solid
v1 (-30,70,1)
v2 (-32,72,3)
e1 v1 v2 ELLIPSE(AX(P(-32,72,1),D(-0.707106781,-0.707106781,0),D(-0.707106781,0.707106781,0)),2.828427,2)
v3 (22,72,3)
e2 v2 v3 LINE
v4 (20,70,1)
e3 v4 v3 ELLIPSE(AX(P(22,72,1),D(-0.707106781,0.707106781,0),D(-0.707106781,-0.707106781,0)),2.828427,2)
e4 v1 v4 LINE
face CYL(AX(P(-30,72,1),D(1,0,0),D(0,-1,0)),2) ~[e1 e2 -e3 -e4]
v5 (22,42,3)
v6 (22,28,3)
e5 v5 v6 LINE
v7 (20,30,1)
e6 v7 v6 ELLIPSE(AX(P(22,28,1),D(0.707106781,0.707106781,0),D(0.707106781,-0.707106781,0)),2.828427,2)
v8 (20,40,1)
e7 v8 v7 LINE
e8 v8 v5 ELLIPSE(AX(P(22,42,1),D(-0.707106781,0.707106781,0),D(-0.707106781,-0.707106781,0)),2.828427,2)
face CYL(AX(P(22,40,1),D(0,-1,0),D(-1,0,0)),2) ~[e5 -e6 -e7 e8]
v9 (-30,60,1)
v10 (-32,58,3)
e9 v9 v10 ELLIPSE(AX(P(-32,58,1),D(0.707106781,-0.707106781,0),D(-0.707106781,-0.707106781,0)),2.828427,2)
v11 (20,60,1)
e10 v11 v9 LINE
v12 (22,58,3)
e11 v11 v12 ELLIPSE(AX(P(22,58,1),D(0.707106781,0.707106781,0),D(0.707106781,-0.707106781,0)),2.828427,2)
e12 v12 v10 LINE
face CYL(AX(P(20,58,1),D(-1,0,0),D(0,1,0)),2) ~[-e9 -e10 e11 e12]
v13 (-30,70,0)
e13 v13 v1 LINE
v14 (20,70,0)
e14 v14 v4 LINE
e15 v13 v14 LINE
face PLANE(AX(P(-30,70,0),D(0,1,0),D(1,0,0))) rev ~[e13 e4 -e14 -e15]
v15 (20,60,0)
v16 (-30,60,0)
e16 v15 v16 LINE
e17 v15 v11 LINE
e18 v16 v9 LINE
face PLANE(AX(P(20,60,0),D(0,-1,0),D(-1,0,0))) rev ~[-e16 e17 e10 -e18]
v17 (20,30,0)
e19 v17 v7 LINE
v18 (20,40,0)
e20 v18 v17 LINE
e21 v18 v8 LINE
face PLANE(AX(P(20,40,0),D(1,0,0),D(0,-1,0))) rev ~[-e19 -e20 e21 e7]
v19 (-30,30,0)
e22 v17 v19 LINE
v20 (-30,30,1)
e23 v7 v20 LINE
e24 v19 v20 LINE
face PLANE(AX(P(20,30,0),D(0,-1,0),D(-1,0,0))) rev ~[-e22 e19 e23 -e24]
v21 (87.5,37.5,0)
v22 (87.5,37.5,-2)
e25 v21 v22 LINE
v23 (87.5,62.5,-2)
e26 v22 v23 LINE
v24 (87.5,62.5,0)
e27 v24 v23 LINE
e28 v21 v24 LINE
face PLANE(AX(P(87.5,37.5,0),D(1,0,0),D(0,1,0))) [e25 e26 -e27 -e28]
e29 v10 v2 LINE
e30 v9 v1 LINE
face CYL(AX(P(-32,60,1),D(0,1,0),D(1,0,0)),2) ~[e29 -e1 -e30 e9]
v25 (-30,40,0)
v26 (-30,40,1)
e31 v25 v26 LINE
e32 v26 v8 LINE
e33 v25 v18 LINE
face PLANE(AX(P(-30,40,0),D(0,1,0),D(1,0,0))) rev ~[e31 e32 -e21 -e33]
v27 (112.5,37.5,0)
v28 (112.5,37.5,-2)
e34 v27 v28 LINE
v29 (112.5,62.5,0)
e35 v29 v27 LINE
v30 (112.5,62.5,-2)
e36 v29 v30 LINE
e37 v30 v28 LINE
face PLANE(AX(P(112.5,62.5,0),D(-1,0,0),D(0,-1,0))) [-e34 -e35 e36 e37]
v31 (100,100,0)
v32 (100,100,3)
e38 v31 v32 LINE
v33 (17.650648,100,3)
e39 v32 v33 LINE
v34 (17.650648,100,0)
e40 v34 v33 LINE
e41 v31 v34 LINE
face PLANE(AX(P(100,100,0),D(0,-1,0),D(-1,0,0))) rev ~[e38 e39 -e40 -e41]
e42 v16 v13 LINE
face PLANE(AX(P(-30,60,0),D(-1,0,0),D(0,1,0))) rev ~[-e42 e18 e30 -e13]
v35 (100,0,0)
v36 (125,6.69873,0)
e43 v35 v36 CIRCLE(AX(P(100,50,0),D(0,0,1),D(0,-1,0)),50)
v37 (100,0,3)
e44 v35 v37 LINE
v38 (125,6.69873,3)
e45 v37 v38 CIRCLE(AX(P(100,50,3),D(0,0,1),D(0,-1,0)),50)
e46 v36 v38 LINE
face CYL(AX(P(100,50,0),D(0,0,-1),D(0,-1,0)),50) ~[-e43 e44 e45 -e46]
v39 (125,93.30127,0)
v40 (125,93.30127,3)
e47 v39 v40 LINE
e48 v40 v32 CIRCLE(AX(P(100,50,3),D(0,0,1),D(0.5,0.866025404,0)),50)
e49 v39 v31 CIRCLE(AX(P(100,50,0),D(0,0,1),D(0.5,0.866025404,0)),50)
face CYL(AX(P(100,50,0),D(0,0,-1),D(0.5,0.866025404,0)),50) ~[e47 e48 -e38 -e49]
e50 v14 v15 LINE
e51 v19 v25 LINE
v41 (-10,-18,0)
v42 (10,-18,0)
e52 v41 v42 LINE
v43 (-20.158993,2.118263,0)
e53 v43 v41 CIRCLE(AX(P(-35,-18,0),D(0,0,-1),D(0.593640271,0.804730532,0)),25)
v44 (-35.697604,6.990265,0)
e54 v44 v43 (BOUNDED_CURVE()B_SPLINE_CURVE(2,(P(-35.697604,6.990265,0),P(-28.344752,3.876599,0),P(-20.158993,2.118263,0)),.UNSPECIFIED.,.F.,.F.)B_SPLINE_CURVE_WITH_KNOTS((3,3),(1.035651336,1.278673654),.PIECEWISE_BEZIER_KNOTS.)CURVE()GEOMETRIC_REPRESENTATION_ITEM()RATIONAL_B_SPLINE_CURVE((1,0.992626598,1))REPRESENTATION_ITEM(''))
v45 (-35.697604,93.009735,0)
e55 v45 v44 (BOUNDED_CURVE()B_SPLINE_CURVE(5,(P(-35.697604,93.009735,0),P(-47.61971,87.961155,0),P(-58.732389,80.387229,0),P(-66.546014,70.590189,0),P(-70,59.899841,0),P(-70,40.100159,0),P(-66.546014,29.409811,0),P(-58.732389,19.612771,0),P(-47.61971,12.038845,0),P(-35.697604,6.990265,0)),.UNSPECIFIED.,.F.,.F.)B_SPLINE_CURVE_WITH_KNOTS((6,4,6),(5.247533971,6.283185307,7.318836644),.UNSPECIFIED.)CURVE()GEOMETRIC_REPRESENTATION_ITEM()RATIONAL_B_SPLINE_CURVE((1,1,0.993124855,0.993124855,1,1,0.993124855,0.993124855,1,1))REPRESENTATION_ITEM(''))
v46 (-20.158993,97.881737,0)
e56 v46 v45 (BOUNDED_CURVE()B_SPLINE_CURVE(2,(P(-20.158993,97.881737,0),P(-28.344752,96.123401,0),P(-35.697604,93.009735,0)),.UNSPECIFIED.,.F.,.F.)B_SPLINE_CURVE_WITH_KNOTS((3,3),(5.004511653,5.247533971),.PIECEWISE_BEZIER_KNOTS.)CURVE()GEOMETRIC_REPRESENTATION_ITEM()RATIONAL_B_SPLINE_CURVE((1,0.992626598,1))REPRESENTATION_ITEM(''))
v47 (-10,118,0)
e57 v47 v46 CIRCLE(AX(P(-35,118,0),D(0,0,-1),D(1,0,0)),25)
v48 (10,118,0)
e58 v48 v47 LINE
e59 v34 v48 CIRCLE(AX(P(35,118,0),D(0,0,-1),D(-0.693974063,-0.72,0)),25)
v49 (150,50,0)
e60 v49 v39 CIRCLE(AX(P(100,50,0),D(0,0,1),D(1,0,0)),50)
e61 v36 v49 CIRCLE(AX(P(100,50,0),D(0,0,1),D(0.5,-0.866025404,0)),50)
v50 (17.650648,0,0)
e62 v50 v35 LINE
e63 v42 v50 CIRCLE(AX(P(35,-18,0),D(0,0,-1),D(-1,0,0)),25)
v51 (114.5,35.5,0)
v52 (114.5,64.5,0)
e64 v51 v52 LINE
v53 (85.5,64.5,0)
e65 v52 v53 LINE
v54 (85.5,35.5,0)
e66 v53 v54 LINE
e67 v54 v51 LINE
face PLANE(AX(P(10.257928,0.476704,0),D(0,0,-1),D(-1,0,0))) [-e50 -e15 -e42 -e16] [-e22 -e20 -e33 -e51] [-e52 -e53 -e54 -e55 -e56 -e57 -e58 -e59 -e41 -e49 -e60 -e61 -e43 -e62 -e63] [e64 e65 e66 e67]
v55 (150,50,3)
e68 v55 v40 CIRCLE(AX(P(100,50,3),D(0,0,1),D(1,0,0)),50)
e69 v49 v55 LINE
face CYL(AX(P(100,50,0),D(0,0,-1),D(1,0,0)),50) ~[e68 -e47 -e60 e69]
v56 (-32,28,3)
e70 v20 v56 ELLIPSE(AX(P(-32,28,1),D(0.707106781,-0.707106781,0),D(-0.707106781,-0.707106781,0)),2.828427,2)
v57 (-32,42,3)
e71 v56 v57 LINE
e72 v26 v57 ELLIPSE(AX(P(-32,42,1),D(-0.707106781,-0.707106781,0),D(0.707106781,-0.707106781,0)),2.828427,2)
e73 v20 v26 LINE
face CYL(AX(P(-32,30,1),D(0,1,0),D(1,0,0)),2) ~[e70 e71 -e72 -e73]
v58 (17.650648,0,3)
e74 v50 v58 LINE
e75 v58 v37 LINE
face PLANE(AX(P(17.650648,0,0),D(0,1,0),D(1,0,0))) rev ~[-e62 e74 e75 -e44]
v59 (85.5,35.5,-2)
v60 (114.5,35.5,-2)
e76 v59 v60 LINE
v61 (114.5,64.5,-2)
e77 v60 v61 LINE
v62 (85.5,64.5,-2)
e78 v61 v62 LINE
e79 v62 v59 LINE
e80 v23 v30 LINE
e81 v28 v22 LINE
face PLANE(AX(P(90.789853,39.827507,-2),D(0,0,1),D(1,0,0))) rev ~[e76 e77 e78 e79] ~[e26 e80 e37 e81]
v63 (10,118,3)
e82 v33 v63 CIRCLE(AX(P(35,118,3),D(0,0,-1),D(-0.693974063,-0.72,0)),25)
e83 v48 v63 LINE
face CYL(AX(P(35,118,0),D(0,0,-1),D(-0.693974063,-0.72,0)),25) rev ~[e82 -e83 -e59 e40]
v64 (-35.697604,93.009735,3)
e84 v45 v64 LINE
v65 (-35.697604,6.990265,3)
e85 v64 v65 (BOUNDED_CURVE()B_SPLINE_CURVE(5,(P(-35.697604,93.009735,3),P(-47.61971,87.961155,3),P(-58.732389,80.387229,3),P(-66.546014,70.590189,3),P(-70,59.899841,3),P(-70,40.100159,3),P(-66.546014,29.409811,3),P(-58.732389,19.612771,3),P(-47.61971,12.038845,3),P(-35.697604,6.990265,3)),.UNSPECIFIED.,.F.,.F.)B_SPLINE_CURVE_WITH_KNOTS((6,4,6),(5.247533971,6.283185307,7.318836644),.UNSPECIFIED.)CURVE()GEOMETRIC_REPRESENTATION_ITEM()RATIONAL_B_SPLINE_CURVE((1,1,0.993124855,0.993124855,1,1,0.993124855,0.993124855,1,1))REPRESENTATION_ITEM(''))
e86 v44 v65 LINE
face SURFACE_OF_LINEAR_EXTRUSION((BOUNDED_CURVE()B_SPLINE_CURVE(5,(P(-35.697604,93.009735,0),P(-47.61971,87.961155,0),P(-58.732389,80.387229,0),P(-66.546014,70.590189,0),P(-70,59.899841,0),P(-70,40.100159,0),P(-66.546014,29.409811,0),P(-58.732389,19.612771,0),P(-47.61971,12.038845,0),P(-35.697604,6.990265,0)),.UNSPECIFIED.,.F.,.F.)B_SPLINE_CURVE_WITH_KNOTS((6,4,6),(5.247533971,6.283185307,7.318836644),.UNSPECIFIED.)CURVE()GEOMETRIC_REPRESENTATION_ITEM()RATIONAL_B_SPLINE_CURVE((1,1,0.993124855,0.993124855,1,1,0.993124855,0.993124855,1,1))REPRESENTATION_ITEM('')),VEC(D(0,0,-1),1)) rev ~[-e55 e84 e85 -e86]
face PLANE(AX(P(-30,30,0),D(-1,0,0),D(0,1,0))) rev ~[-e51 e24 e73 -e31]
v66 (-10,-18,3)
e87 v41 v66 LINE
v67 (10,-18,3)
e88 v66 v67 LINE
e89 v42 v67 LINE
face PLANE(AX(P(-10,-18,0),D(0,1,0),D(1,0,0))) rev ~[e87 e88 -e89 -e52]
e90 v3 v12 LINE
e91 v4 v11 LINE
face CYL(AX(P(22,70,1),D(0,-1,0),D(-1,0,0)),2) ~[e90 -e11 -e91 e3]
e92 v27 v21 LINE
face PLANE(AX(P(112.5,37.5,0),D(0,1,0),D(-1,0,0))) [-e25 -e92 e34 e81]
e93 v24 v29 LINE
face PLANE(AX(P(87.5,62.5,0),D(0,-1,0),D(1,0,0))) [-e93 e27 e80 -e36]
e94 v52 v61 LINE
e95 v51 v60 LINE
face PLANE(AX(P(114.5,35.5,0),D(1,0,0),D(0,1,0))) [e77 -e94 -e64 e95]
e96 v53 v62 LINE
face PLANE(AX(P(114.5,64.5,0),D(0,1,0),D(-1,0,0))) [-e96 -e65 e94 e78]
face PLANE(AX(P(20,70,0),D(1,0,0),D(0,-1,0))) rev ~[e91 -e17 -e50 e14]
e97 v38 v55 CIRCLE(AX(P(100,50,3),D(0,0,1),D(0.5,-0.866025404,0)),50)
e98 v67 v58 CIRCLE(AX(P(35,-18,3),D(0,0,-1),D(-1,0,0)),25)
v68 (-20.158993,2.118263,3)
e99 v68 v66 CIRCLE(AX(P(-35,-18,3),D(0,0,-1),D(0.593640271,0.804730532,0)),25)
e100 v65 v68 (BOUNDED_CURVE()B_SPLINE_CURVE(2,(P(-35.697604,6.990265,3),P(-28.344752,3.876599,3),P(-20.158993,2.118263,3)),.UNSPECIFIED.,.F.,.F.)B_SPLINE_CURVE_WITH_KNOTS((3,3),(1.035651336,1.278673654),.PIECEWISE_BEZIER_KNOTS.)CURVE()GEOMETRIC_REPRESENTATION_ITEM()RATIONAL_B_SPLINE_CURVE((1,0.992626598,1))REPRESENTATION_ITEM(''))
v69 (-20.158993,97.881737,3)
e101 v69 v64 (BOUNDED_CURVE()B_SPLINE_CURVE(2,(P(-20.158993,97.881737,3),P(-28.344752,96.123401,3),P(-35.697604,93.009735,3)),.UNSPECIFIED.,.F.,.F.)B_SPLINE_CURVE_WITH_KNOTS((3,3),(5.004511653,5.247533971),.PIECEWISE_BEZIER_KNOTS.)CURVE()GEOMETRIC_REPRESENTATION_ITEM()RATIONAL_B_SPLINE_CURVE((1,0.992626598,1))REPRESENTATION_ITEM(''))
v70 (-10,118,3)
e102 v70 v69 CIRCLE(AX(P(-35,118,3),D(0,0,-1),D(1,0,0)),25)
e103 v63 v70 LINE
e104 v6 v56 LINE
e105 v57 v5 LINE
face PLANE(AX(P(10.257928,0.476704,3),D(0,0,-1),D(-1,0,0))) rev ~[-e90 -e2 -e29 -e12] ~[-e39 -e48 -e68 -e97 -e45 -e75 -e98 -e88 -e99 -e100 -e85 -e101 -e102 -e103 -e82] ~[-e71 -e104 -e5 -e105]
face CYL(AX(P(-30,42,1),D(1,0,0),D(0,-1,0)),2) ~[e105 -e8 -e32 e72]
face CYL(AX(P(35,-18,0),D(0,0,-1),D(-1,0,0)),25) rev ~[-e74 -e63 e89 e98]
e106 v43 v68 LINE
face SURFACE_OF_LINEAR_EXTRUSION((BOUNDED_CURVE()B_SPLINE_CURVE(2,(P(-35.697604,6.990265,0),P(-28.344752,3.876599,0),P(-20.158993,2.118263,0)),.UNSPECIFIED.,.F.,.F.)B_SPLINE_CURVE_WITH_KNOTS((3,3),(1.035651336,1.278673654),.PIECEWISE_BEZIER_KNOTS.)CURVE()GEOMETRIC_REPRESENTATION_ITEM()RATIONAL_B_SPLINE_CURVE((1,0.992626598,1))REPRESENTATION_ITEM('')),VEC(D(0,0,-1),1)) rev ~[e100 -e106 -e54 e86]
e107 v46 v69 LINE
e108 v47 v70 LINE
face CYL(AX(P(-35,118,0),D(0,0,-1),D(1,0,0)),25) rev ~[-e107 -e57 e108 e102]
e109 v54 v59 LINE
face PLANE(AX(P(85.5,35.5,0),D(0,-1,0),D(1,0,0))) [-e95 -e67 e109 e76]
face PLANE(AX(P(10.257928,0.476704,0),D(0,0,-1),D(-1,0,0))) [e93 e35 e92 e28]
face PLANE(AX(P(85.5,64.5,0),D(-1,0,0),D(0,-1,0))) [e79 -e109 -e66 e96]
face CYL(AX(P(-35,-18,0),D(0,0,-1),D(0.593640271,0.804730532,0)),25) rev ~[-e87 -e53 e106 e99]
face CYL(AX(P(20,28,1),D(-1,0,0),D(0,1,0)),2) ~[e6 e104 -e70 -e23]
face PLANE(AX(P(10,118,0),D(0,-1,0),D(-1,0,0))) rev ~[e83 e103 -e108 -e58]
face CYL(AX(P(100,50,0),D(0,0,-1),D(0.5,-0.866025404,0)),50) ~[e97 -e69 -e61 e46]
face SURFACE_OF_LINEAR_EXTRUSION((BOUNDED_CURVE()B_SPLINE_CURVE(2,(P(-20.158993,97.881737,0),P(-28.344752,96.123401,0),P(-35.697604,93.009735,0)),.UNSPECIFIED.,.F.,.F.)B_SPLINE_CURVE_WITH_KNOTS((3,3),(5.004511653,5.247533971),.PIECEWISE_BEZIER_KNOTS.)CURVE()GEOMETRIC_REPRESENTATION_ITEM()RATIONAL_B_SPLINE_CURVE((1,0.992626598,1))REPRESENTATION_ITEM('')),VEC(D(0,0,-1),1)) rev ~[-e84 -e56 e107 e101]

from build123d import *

# Parameters (mm, degrees)
F1_DEPTH = 3
F2_R     = 2
F3_DEPTH = 2


with BuildPart() as f1:
    # F0 (on Top) → F1 (new body)
    with BuildSketch(Plane.XY):
        with BuildLine():
            add(Edge.make_bspline(
                [(0, 0), (10.2976274735, 0), (20.158993222, 2.1182632902)],
                knots=[1.5707963268, 1.5707963268, 1.5707963268, 1.8629189995, 1.8629189995, 1.8629189995], degree=2, weights=[1, 0.9893519935, 1]))
            Line((0, 0), (17.6506484271, 0))
            ThreePointArc((17.6506484271, 0), (18.8700107709, 1.1003520247), (20.158993222, 2.1182632902))
        make_face()
        with BuildLine():
            add(Edge.make_bspline(
                [(-20.158993222, 2.1182632902), (-10.2976274735, 0), (0, 0)],
                knots=[1.2786736541, 1.2786736541, 1.2786736541, 1.5707963268, 1.5707963268, 1.5707963268], degree=2, weights=[1, 0.9893519935, 1]))
            Line((0, 0), (0, 30))
            Line((0, 30), (-10, 30))
            Line((-10, 30), (-30, 30))
            Line((-30, 30), (-30, 40))
            Line((-30, 40), (-10, 40))
            Line((-10, 40), (0, 40))
            Line((0, 40), (0, 50))
            Line((0, 50), (-70, 50))
            add(Edge.make_bspline(
                [(-70, 50), (-70, 21.516086051), (-35.6976035326, 6.9902650909)],
                knots=[0, 0, 0, 1.0356513364, 1.0356513364, 1.0356513364], degree=2, weights=[1, 0.8688975097, 1]))
            ThreePointArc((-35.6976035326, 6.9902650909), (-27.5204903752, 5.8549142898), (-20.158993222, 2.1182632902))
        make_face()
        with BuildLine():
            Line((0, -18), (0, 0))
            add(Edge.make_bspline(
                [(-20.158993222, 2.1182632902), (-10.2976274735, 0), (0, 0)],
                knots=[1.2786736541, 1.2786736541, 1.2786736541, 1.5707963268, 1.5707963268, 1.5707963268], degree=2, weights=[1, 0.9893519935, 1]))
            ThreePointArc((-20.158993222, 2.1182632902), (-12.6838044298, -6.7311307011), (-10, -18))
            Line((-10, -18), (0, -18))
        make_face()
        with BuildLine():
            Line((0, 30), (0, 0))
            add(Edge.make_bspline(
                [(0, 0), (10.2976274735, 0), (20.158993222, 2.1182632902)],
                knots=[1.5707963268, 1.5707963268, 1.5707963268, 1.8629189995, 1.8629189995, 1.8629189995], degree=2, weights=[1, 0.9893519935, 1]))
            ThreePointArc((20.158993222, 2.1182632902), (27.5204903752, 5.8549142898), (35.6976035326, 6.9902650909))
            add(Edge.make_bspline(
                [(35.6976035326, 6.9902650909), (49.4779363229, 12.8257362969), (58.3333333333, 22.3614600804)],
                knots=[2.1059413172, 2.1059413172, 2.1059413172, 2.5559071101, 2.5559071101, 2.5559071101], degree=2, weights=[1, 0.9747979228, 1]))
            ThreePointArc((58.3333333333, 22.3614600804), (52.1286446122, 35.5662432703), (50, 50))
            Line((50, 50), (0, 50))
            Line((0, 50), (0, 40))
            Line((0, 40), (20, 40))
            Line((20, 40), (20, 30))
            Line((20, 30), (0, 30))
        make_face()
        with BuildLine():
            Line((17.6506484271, 0), (0, 0))
            Line((0, 0), (0, -18))
            Line((0, -18), (10, -18))
            ThreePointArc((10, -18), (11.9920254116, -8.2207819669), (17.6506484271, 0))
        make_face()
        with BuildLine():
            ThreePointArc((20.158993222, 2.1182632902), (18.8700107709, 1.1003520247), (17.6506484271, 0))
            Line((17.6506484271, 0), (52.3493515729, 0))
            ThreePointArc((52.3493515729, 0), (44.67672975, 5.0512668056), (35.6976035326, 6.9902650909))
            add(Edge.make_bspline(
                [(20.158993222, 2.1182632902), (28.3447518468, 3.8765990461), (35.6976035326, 6.9902650909)],
                knots=[1.8629189995, 1.8629189995, 1.8629189995, 2.1059413172, 2.1059413172, 2.1059413172], degree=2, weights=[1, 0.9926265982, 1]))
        make_face()
        with BuildLine():
            add(Edge.make_bspline(
                [(-35.6976035326, 6.9902650909), (-28.3447518468, 3.8765990461), (-20.158993222, 2.1182632902)],
                knots=[1.0356513364, 1.0356513364, 1.0356513364, 1.2786736541, 1.2786736541, 1.2786736541], degree=2, weights=[1, 0.9926265982, 1]))
            ThreePointArc((-20.158993222, 2.1182632902), (-27.5204903752, 5.8549142898), (-35.6976035326, 6.9902650909))
        make_face()
        with BuildLine():
            ThreePointArc((35.6976035326, 6.9902650909), (27.5204903752, 5.8549142898), (20.158993222, 2.1182632902))
            add(Edge.make_bspline(
                [(20.158993222, 2.1182632902), (28.3447518468, 3.8765990461), (35.6976035326, 6.9902650909)],
                knots=[1.8629189995, 1.8629189995, 1.8629189995, 2.1059413172, 2.1059413172, 2.1059413172], degree=2, weights=[1, 0.9926265982, 1]))
        make_face()
        with BuildLine():
            ThreePointArc((35.6976035326, 6.9902650909), (44.67672975, 5.0512668056), (52.3493515729, 0))
            Line((52.3493515729, 0), (100, 0))
            ThreePointArc((100, 0), (76.3560472423, 5.9436327191), (58.3333333333, 22.3614600804))
            add(Edge.make_bspline(
                [(35.6976035326, 6.9902650909), (49.4779363229, 12.8257362969), (58.3333333333, 22.3614600804)],
                knots=[2.1059413172, 2.1059413172, 2.1059413172, 2.5559071101, 2.5559071101, 2.5559071101], degree=2, weights=[1, 0.9747979228, 1]))
        make_face()
        with BuildLine():
            ThreePointArc((58.3333333333, 22.3614600804), (76.3560472423, 5.9436327191), (100, 0))
            ThreePointArc((100, 0), (112.9409522551, 1.7037086855), (125, 6.6987298108))
            ThreePointArc((125, 6.6987298108), (110.8310397827, 18.9227968521), (102.1486677301, 35.5))
            Line((102.1486677301, 35.5), (85.5, 35.5))
            Line((85.5, 35.5), (85.5, 50))
            Line((85.5, 50), (70, 50))
            add(Edge.make_bspline(
                [(58.3333333333, 22.3614600804), (70, 34.9244327711), (70, 50)],
                knots=[2.5559071101, 2.5559071101, 2.5559071101, 3.1415926536, 3.1415926536, 3.1415926536], degree=2, weights=[1, 0.9574271078, 1]))
        make_face()
        with BuildLine():
            add(Edge.make_bspline(
                [(-35.6976035326, 93.0097349091), (-70, 78.483913949), (-70, 50)],
                knots=[5.2475339708, 5.2475339708, 5.2475339708, 6.2831853072, 6.2831853072, 6.2831853072], degree=2, weights=[1, 0.8688975097, 1]))
            Line((-70, 50), (0, 50))
            Line((0, 50), (0, 60))
            Line((0, 60), (-10, 60))
            Line((-10, 60), (-30, 60))
            Line((-30, 60), (-30, 70))
            Line((-30, 70), (-10, 70))
            Line((-10, 70), (0, 70))
            Line((0, 70), (0, 100))
            add(Edge.make_bspline(
                [(0, 100), (-10.2976274735, 100), (-20.158993222, 97.8817367098)],
                knots=[4.7123889804, 4.7123889804, 4.7123889804, 5.0045116531, 5.0045116531, 5.0045116531], degree=2, weights=[1, 0.9893519935, 1]))
            add(Edge.make_bspline(
                [(-20.158993222, 97.8817367098), (-28.3447518468, 96.1234009539), (-35.6976035326, 93.0097349091)],
                knots=[5.0045116531, 5.0045116531, 5.0045116531, 5.2475339708, 5.2475339708, 5.2475339708], degree=2, weights=[1, 0.9926265982, 1]))
        make_face()
        with BuildLine():
            ThreePointArc((50, 50), (52.1286446122, 35.5662432703), (58.3333333333, 22.3614600804))
            add(Edge.make_bspline(
                [(58.3333333333, 22.3614600804), (70, 34.9244327711), (70, 50)],
                knots=[2.5559071101, 2.5559071101, 2.5559071101, 3.1415926536, 3.1415926536, 3.1415926536], degree=2, weights=[1, 0.9574271078, 1]))
            Line((70, 50), (50, 50))
        make_face()
        with BuildLine():
            ThreePointArc((102.1486677301, 35.5), (110.8310397827, 18.9227968521), (125, 6.6987298108))
            ThreePointArc((125, 6.6987298108), (143.3012701892, 25), (150, 50))
            Line((150, 50), (114.5, 50))
            Line((114.5, 50), (114.5, 35.5))
            Line((114.5, 35.5), (102.1486677301, 35.5))
        make_face()
        with BuildLine():
            Line((0, 60), (0, 50))
            Line((0, 50), (50, 50))
            ThreePointArc((50, 50), (52.1286446122, 64.4337567297), (58.3333333333, 77.6385399196))
            add(Edge.make_bspline(
                [(58.3333333333, 77.6385399196), (49.4779363229, 87.1742637031), (35.6976035326, 93.0097349091)],
                knots=[3.727278197, 3.727278197, 3.727278197, 4.17724399, 4.17724399, 4.17724399], degree=2, weights=[1, 0.9747979228, 1]))
            ThreePointArc((35.6976035326, 93.0097349091), (27.5204903752, 94.1450857102), (20.158993222, 97.8817367098))
            add(Edge.make_bspline(
                [(20.158993222, 97.8817367098), (10.2976274735, 100), (0, 100)],
                knots=[4.4202663077, 4.4202663077, 4.4202663077, 4.7123889804, 4.7123889804, 4.7123889804], degree=2, weights=[1, 0.9893519935, 1]))
            Line((0, 100), (0, 70))
            Line((0, 70), (20, 70))
            Line((20, 70), (20, 60))
            Line((20, 60), (0, 60))
        make_face()
        with BuildLine():
            Line((50, 50), (70, 50))
            add(Edge.make_bspline(
                [(70, 50), (70, 65.0755672289), (58.3333333333, 77.6385399196)],
                knots=[3.1415926536, 3.1415926536, 3.1415926536, 3.727278197, 3.727278197, 3.727278197], degree=2, weights=[1, 0.9574271078, 1]))
            ThreePointArc((58.3333333333, 77.6385399196), (52.1286446122, 64.4337567297), (50, 50))
        make_face()
        with BuildLine():
            add(Edge.make_bspline(
                [(70, 50), (70, 65.0755672289), (58.3333333333, 77.6385399196)],
                knots=[3.1415926536, 3.1415926536, 3.1415926536, 3.727278197, 3.727278197, 3.727278197], degree=2, weights=[1, 0.9574271078, 1]))
            Line((70, 50), (85.5, 50))
            Line((85.5, 50), (85.5, 64.5))
            Line((85.5, 64.5), (102.1486677301, 64.5))
            ThreePointArc((102.1486677301, 64.5), (110.8310397827, 81.0772031479), (125, 93.3012701892))
            ThreePointArc((125, 93.3012701892), (112.9409522551, 98.2962913145), (100, 100))
            ThreePointArc((100, 100), (76.3560472423, 94.0563672809), (58.3333333333, 77.6385399196))
        make_face()
        with BuildLine():
            Line((85.5, 35.5), (102.1486677301, 35.5))
            ThreePointArc((102.1486677301, 35.5), (101.8578009321, 36.4970866512), (101.5877081724, 37.5))
            Line((101.5877081724, 37.5), (87.5, 37.5))
            Line((87.5, 37.5), (87.5, 50))
            Line((87.5, 50), (85.5, 50))
            Line((85.5, 50), (85.5, 35.5))
        make_face()
        with BuildLine():
            ThreePointArc((101.5877081724, 37.5), (101.8578009321, 36.4970866512), (102.1486677301, 35.5))
            Line((102.1486677301, 35.5), (114.5, 35.5))
            Line((114.5, 35.5), (114.5, 50))
            Line((114.5, 50), (112.5, 50))
            Line((112.5, 50), (112.5, 37.5))
            Line((112.5, 37.5), (101.5877081724, 37.5))
        make_face()
        with BuildLine():
            Line((114.5, 50), (150, 50))
            ThreePointArc((150, 50), (143.3012701892, 75), (125, 93.3012701892))
            ThreePointArc((125, 93.3012701892), (110.8310397827, 81.0772031479), (102.1486677301, 64.5))
            Line((102.1486677301, 64.5), (114.5, 64.5))
            Line((114.5, 64.5), (114.5, 50))
        make_face()
        with BuildLine():
            ThreePointArc((-10, 118), (-12.6838044298, 106.7311307011), (-20.158993222, 97.8817367098))
            add(Edge.make_bspline(
                [(0, 100), (-10.2976274735, 100), (-20.158993222, 97.8817367098)],
                knots=[4.7123889804, 4.7123889804, 4.7123889804, 5.0045116531, 5.0045116531, 5.0045116531], degree=2, weights=[1, 0.9893519935, 1]))
            Line((0, 100), (0, 118))
            Line((0, 118), (-10, 118))
        make_face()
        with BuildLine():
            add(Edge.make_bspline(
                [(58.3333333333, 77.6385399196), (49.4779363229, 87.1742637031), (35.6976035326, 93.0097349091)],
                knots=[3.727278197, 3.727278197, 3.727278197, 4.17724399, 4.17724399, 4.17724399], degree=2, weights=[1, 0.9747979228, 1]))
            ThreePointArc((58.3333333333, 77.6385399196), (76.3560472423, 94.0563672809), (100, 100))
            Line((100, 100), (52.3493515729, 100))
            ThreePointArc((52.3493515729, 100), (44.67672975, 94.9487331944), (35.6976035326, 93.0097349091))
        make_face()
        with BuildLine():
            Line((85.5, 64.5), (85.5, 50))
            Line((85.5, 50), (87.5, 50))
            Line((87.5, 50), (87.5, 62.5))
            Line((87.5, 62.5), (101.5877081724, 62.5))
            ThreePointArc((101.5877081724, 62.5), (101.8578009321, 63.5029133488), (102.1486677301, 64.5))
            Line((102.1486677301, 64.5), (85.5, 64.5))
        make_face()
        with BuildLine():
            Line((87.5, 37.5), (101.5877081724, 37.5))
            ThreePointArc((101.5877081724, 37.5), (100.3985151866, 43.6997853759), (100, 50))
            Line((100, 50), (87.5, 50))
            Line((87.5, 50), (87.5, 37.5))
        make_face()
        with BuildLine():
            ThreePointArc((100, 50), (100.3985151866, 43.6997853759), (101.5877081724, 37.5))
            Line((101.5877081724, 37.5), (112.5, 37.5))
            Line((112.5, 37.5), (112.5, 50))
            Line((112.5, 50), (100, 50))
        make_face()
        with BuildLine():
            Line((112.5, 50), (114.5, 50))
            Line((114.5, 50), (114.5, 64.5))
            Line((114.5, 64.5), (102.1486677301, 64.5))
            ThreePointArc((102.1486677301, 64.5), (101.8578009321, 63.5029133488), (101.5877081724, 62.5))
            Line((101.5877081724, 62.5), (112.5, 62.5))
            Line((112.5, 62.5), (112.5, 50))
        make_face()
        with BuildLine():
            Line((0, 118), (0, 100))
            Line((0, 100), (17.6506484271, 100))
            ThreePointArc((17.6506484271, 100), (11.9920254116, 108.2207819669), (10, 118))
            Line((10, 118), (0, 118))
        make_face()
        with BuildLine():
            Line((17.6506484271, 100), (0, 100))
            add(Edge.make_bspline(
                [(20.158993222, 97.8817367098), (10.2976274735, 100), (0, 100)],
                knots=[4.4202663077, 4.4202663077, 4.4202663077, 4.7123889804, 4.7123889804, 4.7123889804], degree=2, weights=[1, 0.9893519935, 1]))
            ThreePointArc((20.158993222, 97.8817367098), (18.8700107709, 98.8996479753), (17.6506484271, 100))
        make_face()
        with BuildLine():
            ThreePointArc((20.158993222, 97.8817367098), (27.5204903752, 94.1450857102), (35.6976035326, 93.0097349091))
            add(Edge.make_bspline(
                [(35.6976035326, 93.0097349091), (28.3447518468, 96.1234009539), (20.158993222, 97.8817367098)],
                knots=[4.17724399, 4.17724399, 4.17724399, 4.4202663077, 4.4202663077, 4.4202663077], degree=2, weights=[1, 0.9926265982, 1]))
        make_face()
        with BuildLine():
            add(Edge.make_bspline(
                [(35.6976035326, 93.0097349091), (28.3447518468, 96.1234009539), (20.158993222, 97.8817367098)],
                knots=[4.17724399, 4.17724399, 4.17724399, 4.4202663077, 4.4202663077, 4.4202663077], degree=2, weights=[1, 0.9926265982, 1]))
            ThreePointArc((35.6976035326, 93.0097349091), (44.67672975, 94.9487331944), (52.3493515729, 100))
            Line((52.3493515729, 100), (17.6506484271, 100))
            ThreePointArc((17.6506484271, 100), (18.8700107709, 98.8996479753), (20.158993222, 97.8817367098))
        make_face()
        with BuildLine():
            Line((87.5, 62.5), (87.5, 50))
            Line((87.5, 50), (100, 50))
            ThreePointArc((100, 50), (100.3985151866, 56.3002146241), (101.5877081724, 62.5))
            Line((101.5877081724, 62.5), (87.5, 62.5))
        make_face()
        with BuildLine():
            ThreePointArc((101.5877081724, 62.5), (100.3985151866, 56.3002146241), (100, 50))
            Line((100, 50), (112.5, 50))
            Line((112.5, 50), (112.5, 62.5))
            Line((112.5, 62.5), (101.5877081724, 62.5))
        make_face()
    extrude(amount=F1_DEPTH)

    # F2
    f2_edges = [f1.edges().sort_by_distance(p)[0] for p in [
        (20, 65, 3),
        (20, 35, 3),
        (-5, 40, 3),
        (-5, 60, 3),
        (-5, 30, 3),
        (-30, 35, 3),
        (-30, 65, 3),
        (-5, 70, 3),
    ]]
    fillet(f2_edges, radius=F2_R)

    # F0 (on Top) → F3 (join)
    with BuildSketch(Plane.XY):
        with BuildLine():
            Line((85.5, 35.5), (102.1486677301, 35.5))
            ThreePointArc((102.1486677301, 35.5), (101.8578009321, 36.4970866512), (101.5877081724, 37.5))
            Line((101.5877081724, 37.5), (87.5, 37.5))
            Line((87.5, 37.5), (87.5, 50))
            Line((87.5, 50), (85.5, 50))
            Line((85.5, 50), (85.5, 35.5))
        make_face()
        with BuildLine():
            ThreePointArc((101.5877081724, 37.5), (101.8578009321, 36.4970866512), (102.1486677301, 35.5))
            Line((102.1486677301, 35.5), (114.5, 35.5))
            Line((114.5, 35.5), (114.5, 50))
            Line((114.5, 50), (112.5, 50))
            Line((112.5, 50), (112.5, 37.5))
            Line((112.5, 37.5), (101.5877081724, 37.5))
        make_face()
        with BuildLine():
            Line((112.5, 50), (114.5, 50))
            Line((114.5, 50), (114.5, 64.5))
            Line((114.5, 64.5), (102.1486677301, 64.5))
            ThreePointArc((102.1486677301, 64.5), (101.8578009321, 63.5029133488), (101.5877081724, 62.5))
            Line((101.5877081724, 62.5), (112.5, 62.5))
            Line((112.5, 62.5), (112.5, 50))
        make_face()
        with BuildLine():
            Line((85.5, 64.5), (85.5, 50))
            Line((85.5, 50), (87.5, 50))
            Line((87.5, 50), (87.5, 62.5))
            Line((87.5, 62.5), (101.5877081724, 62.5))
            ThreePointArc((101.5877081724, 62.5), (101.8578009321, 63.5029133488), (102.1486677301, 64.5))
            Line((102.1486677301, 64.5), (85.5, 64.5))
        make_face()
    extrude(amount=-F3_DEPTH)


solid = f1.part
